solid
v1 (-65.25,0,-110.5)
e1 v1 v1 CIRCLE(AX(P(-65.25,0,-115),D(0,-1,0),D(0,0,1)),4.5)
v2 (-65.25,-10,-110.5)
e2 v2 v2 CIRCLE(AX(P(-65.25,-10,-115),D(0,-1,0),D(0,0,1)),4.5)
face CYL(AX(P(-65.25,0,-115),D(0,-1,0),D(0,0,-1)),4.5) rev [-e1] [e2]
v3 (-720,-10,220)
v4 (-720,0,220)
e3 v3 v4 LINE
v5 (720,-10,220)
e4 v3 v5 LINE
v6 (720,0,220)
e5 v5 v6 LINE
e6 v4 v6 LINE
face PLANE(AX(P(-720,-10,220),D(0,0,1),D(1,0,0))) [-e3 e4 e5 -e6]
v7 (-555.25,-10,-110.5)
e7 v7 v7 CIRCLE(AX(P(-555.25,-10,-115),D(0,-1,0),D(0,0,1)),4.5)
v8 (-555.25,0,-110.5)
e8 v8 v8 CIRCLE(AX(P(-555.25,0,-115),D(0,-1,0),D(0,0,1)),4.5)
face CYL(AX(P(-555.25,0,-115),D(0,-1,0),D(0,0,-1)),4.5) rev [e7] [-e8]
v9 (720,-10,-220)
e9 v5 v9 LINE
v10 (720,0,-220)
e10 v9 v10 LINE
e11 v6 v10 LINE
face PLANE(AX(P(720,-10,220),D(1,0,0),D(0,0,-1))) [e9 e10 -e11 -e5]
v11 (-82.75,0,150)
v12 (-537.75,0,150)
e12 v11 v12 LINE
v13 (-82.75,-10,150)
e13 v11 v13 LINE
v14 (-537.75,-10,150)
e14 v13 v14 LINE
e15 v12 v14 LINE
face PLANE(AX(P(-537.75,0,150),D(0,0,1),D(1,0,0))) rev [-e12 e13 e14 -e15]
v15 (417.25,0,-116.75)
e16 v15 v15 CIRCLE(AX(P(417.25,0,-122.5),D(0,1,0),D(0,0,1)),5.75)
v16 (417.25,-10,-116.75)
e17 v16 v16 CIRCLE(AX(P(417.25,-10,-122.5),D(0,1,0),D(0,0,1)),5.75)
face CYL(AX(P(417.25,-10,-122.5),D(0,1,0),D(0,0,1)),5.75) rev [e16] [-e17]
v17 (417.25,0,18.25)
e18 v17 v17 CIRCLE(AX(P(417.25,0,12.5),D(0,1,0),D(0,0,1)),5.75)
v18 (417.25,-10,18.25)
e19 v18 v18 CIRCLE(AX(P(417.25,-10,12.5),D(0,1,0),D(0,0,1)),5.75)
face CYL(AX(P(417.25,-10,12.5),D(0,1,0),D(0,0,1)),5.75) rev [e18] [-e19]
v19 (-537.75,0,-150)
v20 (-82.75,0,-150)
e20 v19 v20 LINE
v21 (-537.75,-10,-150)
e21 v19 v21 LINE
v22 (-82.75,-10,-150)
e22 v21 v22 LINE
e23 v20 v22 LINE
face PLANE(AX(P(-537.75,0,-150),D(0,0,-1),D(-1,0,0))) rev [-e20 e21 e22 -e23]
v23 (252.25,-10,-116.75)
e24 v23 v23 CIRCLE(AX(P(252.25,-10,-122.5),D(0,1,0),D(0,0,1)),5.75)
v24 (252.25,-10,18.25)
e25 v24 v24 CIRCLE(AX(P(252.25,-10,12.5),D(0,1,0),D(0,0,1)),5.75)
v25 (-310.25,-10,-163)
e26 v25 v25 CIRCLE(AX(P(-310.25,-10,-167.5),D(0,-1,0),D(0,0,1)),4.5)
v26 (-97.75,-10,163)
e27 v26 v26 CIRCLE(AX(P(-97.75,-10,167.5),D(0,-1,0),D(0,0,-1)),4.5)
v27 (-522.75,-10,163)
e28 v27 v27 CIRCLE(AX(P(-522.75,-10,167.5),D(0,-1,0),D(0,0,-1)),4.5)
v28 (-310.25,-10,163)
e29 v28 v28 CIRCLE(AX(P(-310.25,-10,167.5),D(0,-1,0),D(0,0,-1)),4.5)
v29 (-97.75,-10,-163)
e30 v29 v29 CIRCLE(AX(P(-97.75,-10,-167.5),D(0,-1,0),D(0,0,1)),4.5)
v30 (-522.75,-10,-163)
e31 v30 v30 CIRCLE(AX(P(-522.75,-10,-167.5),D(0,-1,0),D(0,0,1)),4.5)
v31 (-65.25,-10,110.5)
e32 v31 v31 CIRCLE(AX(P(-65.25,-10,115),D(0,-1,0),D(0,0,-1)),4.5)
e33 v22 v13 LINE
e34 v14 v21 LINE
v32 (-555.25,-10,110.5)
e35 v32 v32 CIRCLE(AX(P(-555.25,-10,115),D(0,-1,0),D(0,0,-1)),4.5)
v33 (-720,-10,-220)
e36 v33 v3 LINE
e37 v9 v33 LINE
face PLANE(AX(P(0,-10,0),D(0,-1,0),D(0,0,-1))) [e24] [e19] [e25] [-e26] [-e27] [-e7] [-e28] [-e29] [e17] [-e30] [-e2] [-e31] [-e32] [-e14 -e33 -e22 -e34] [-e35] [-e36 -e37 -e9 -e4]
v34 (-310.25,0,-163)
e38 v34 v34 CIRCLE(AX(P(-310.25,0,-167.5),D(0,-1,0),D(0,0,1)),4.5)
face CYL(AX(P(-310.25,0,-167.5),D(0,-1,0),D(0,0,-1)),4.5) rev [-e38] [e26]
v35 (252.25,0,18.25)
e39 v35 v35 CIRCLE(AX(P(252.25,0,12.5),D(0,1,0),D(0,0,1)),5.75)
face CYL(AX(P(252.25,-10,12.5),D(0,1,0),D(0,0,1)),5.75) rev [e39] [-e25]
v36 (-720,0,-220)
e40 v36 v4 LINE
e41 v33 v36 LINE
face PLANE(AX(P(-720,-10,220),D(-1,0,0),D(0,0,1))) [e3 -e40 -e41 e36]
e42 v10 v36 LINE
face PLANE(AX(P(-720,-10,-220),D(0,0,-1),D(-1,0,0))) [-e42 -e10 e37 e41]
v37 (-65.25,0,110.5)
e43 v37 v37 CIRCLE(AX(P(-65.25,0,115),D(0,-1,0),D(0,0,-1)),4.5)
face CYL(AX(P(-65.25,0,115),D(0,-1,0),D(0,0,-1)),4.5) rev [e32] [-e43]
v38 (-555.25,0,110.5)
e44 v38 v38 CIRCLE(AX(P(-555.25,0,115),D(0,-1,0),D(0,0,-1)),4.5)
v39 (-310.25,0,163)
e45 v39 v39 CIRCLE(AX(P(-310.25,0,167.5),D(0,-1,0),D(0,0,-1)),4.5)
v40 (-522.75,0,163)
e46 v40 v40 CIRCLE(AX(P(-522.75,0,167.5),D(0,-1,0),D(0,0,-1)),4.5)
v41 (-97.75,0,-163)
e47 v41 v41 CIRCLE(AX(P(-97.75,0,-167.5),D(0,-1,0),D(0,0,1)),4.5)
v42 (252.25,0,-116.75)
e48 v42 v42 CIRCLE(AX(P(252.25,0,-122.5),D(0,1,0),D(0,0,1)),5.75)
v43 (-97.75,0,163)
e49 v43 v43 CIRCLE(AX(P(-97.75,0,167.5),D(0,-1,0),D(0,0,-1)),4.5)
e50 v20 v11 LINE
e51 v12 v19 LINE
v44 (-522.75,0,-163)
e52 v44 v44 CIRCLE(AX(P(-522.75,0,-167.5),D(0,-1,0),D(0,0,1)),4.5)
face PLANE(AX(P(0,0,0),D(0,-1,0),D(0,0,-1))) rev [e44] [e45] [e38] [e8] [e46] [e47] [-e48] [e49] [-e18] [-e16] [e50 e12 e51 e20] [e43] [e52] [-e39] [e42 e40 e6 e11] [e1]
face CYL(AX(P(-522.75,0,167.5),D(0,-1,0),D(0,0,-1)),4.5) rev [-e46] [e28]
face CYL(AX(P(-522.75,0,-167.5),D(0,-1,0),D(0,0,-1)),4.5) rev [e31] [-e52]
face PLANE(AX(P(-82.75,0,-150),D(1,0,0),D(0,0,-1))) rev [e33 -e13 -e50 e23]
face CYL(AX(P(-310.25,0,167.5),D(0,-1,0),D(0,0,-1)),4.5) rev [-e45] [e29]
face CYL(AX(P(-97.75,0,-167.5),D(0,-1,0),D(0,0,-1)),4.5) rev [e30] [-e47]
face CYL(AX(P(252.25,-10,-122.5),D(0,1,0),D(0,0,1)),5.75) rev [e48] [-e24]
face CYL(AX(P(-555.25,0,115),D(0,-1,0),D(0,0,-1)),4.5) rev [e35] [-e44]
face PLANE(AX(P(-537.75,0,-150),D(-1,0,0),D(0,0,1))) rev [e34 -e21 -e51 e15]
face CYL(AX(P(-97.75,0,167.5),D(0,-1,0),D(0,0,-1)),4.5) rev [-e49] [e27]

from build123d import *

# Parameters (mm, degrees)
IZIM1_W               = 1440
IZIM1_H               = 440
TABAN_FLAN_1_DEPTH    = 10
IZIM2_W               = 455
IZIM2_H               = 300
KES_EKSTR_ZYON1_DEPTH = 10
IZIM4_R               = 4.5
KES_EKSTR_ZYON4_DEPTH = 10
IZIM5_R               = 5.75
KES_EKSTR_ZYON5_DEPTH = 10


# Sheet-metal steps are written as plain solids
with BuildPart() as part:
    # Çizim1 → Taban-Flanş1 (new body)
    with BuildSketch(Plane(origin=(0, 0, 0), x_dir=(1, 0, 0), z_dir=(0, 1, 0))):
        Rectangle(IZIM1_W, IZIM1_H)
    extrude(amount=-TABAN_FLAN_1_DEPTH)

    # Çizim2 → Kes-Ekstrüzyon1 (cut)
    with BuildSketch(Plane(origin=(0, -10, 0), x_dir=(-1, 0, 0), z_dir=(0, -1, 0))):
        with Locations((310.25, 0)):
            Rectangle(IZIM2_W, IZIM2_H)
    extrude(amount=-KES_EKSTR_ZYON1_DEPTH, mode=Mode.SUBTRACT)

    # Çizim4 → Kes-Ekstrüzyon4 (cut)
    with BuildSketch(Plane(origin=(0, -10, 0), x_dir=(-1, 0, 0), z_dir=(0, -1, 0))):
        with Locations(Location((555.25, -115, 0), (0, 0, 90))):
            Circle(IZIM4_R)
        with Locations(Location((522.75, -167.5, 0), (0, 0, 90))):
            Circle(IZIM4_R)
        with Locations(Location((310.25, -167.5, 0), (0, 0, 90))):
            Circle(IZIM4_R)
        with Locations(Location((97.75, -167.5, 0), (0, 0, 90))):
            Circle(IZIM4_R)
        with Locations(Location((65.25, -115, 0), (0, 0, 90))):
            Circle(IZIM4_R)
        with Locations(Location((65.25, 115, 0), (0, 0, 270))):
            Circle(IZIM4_R)
        with Locations(Location((97.75, 167.5, 0), (0, 0, 270))):
            Circle(IZIM4_R)
        with Locations(Location((310.25, 167.5, 0), (0, 0, 270))):
            Circle(IZIM4_R)
        with Locations(Location((522.75, 167.5, 0), (0, 0, 270))):
            Circle(IZIM4_R)
        with Locations(Location((555.25, 115, 0), (0, 0, 270))):
            Circle(IZIM4_R)
    extrude(amount=-KES_EKSTR_ZYON4_DEPTH, mode=Mode.SUBTRACT)

    # Çizim5 → Kes-Ekstrüzyon5 (cut)
    with BuildSketch(Plane(origin=(0, 0, 0), x_dir=(1, 0, 0), z_dir=(0, 1, 0))):
        with Locations(Location((252.25, -12.5, 0), (0, 0, 270))):
            Circle(IZIM5_R)
        with Locations(Location((252.25, 122.5, 0), (0, 0, 270))):
            Circle(IZIM5_R)
        with Locations(Location((417.25, 122.5, 0), (0, 0, 270))):
            Circle(IZIM5_R)
        with Locations(Location((417.25, -12.5, 0), (0, 0, 270))):
            Circle(IZIM5_R)
    extrude(amount=-KES_EKSTR_ZYON5_DEPTH, mode=Mode.SUBTRACT)


solid = part.part
